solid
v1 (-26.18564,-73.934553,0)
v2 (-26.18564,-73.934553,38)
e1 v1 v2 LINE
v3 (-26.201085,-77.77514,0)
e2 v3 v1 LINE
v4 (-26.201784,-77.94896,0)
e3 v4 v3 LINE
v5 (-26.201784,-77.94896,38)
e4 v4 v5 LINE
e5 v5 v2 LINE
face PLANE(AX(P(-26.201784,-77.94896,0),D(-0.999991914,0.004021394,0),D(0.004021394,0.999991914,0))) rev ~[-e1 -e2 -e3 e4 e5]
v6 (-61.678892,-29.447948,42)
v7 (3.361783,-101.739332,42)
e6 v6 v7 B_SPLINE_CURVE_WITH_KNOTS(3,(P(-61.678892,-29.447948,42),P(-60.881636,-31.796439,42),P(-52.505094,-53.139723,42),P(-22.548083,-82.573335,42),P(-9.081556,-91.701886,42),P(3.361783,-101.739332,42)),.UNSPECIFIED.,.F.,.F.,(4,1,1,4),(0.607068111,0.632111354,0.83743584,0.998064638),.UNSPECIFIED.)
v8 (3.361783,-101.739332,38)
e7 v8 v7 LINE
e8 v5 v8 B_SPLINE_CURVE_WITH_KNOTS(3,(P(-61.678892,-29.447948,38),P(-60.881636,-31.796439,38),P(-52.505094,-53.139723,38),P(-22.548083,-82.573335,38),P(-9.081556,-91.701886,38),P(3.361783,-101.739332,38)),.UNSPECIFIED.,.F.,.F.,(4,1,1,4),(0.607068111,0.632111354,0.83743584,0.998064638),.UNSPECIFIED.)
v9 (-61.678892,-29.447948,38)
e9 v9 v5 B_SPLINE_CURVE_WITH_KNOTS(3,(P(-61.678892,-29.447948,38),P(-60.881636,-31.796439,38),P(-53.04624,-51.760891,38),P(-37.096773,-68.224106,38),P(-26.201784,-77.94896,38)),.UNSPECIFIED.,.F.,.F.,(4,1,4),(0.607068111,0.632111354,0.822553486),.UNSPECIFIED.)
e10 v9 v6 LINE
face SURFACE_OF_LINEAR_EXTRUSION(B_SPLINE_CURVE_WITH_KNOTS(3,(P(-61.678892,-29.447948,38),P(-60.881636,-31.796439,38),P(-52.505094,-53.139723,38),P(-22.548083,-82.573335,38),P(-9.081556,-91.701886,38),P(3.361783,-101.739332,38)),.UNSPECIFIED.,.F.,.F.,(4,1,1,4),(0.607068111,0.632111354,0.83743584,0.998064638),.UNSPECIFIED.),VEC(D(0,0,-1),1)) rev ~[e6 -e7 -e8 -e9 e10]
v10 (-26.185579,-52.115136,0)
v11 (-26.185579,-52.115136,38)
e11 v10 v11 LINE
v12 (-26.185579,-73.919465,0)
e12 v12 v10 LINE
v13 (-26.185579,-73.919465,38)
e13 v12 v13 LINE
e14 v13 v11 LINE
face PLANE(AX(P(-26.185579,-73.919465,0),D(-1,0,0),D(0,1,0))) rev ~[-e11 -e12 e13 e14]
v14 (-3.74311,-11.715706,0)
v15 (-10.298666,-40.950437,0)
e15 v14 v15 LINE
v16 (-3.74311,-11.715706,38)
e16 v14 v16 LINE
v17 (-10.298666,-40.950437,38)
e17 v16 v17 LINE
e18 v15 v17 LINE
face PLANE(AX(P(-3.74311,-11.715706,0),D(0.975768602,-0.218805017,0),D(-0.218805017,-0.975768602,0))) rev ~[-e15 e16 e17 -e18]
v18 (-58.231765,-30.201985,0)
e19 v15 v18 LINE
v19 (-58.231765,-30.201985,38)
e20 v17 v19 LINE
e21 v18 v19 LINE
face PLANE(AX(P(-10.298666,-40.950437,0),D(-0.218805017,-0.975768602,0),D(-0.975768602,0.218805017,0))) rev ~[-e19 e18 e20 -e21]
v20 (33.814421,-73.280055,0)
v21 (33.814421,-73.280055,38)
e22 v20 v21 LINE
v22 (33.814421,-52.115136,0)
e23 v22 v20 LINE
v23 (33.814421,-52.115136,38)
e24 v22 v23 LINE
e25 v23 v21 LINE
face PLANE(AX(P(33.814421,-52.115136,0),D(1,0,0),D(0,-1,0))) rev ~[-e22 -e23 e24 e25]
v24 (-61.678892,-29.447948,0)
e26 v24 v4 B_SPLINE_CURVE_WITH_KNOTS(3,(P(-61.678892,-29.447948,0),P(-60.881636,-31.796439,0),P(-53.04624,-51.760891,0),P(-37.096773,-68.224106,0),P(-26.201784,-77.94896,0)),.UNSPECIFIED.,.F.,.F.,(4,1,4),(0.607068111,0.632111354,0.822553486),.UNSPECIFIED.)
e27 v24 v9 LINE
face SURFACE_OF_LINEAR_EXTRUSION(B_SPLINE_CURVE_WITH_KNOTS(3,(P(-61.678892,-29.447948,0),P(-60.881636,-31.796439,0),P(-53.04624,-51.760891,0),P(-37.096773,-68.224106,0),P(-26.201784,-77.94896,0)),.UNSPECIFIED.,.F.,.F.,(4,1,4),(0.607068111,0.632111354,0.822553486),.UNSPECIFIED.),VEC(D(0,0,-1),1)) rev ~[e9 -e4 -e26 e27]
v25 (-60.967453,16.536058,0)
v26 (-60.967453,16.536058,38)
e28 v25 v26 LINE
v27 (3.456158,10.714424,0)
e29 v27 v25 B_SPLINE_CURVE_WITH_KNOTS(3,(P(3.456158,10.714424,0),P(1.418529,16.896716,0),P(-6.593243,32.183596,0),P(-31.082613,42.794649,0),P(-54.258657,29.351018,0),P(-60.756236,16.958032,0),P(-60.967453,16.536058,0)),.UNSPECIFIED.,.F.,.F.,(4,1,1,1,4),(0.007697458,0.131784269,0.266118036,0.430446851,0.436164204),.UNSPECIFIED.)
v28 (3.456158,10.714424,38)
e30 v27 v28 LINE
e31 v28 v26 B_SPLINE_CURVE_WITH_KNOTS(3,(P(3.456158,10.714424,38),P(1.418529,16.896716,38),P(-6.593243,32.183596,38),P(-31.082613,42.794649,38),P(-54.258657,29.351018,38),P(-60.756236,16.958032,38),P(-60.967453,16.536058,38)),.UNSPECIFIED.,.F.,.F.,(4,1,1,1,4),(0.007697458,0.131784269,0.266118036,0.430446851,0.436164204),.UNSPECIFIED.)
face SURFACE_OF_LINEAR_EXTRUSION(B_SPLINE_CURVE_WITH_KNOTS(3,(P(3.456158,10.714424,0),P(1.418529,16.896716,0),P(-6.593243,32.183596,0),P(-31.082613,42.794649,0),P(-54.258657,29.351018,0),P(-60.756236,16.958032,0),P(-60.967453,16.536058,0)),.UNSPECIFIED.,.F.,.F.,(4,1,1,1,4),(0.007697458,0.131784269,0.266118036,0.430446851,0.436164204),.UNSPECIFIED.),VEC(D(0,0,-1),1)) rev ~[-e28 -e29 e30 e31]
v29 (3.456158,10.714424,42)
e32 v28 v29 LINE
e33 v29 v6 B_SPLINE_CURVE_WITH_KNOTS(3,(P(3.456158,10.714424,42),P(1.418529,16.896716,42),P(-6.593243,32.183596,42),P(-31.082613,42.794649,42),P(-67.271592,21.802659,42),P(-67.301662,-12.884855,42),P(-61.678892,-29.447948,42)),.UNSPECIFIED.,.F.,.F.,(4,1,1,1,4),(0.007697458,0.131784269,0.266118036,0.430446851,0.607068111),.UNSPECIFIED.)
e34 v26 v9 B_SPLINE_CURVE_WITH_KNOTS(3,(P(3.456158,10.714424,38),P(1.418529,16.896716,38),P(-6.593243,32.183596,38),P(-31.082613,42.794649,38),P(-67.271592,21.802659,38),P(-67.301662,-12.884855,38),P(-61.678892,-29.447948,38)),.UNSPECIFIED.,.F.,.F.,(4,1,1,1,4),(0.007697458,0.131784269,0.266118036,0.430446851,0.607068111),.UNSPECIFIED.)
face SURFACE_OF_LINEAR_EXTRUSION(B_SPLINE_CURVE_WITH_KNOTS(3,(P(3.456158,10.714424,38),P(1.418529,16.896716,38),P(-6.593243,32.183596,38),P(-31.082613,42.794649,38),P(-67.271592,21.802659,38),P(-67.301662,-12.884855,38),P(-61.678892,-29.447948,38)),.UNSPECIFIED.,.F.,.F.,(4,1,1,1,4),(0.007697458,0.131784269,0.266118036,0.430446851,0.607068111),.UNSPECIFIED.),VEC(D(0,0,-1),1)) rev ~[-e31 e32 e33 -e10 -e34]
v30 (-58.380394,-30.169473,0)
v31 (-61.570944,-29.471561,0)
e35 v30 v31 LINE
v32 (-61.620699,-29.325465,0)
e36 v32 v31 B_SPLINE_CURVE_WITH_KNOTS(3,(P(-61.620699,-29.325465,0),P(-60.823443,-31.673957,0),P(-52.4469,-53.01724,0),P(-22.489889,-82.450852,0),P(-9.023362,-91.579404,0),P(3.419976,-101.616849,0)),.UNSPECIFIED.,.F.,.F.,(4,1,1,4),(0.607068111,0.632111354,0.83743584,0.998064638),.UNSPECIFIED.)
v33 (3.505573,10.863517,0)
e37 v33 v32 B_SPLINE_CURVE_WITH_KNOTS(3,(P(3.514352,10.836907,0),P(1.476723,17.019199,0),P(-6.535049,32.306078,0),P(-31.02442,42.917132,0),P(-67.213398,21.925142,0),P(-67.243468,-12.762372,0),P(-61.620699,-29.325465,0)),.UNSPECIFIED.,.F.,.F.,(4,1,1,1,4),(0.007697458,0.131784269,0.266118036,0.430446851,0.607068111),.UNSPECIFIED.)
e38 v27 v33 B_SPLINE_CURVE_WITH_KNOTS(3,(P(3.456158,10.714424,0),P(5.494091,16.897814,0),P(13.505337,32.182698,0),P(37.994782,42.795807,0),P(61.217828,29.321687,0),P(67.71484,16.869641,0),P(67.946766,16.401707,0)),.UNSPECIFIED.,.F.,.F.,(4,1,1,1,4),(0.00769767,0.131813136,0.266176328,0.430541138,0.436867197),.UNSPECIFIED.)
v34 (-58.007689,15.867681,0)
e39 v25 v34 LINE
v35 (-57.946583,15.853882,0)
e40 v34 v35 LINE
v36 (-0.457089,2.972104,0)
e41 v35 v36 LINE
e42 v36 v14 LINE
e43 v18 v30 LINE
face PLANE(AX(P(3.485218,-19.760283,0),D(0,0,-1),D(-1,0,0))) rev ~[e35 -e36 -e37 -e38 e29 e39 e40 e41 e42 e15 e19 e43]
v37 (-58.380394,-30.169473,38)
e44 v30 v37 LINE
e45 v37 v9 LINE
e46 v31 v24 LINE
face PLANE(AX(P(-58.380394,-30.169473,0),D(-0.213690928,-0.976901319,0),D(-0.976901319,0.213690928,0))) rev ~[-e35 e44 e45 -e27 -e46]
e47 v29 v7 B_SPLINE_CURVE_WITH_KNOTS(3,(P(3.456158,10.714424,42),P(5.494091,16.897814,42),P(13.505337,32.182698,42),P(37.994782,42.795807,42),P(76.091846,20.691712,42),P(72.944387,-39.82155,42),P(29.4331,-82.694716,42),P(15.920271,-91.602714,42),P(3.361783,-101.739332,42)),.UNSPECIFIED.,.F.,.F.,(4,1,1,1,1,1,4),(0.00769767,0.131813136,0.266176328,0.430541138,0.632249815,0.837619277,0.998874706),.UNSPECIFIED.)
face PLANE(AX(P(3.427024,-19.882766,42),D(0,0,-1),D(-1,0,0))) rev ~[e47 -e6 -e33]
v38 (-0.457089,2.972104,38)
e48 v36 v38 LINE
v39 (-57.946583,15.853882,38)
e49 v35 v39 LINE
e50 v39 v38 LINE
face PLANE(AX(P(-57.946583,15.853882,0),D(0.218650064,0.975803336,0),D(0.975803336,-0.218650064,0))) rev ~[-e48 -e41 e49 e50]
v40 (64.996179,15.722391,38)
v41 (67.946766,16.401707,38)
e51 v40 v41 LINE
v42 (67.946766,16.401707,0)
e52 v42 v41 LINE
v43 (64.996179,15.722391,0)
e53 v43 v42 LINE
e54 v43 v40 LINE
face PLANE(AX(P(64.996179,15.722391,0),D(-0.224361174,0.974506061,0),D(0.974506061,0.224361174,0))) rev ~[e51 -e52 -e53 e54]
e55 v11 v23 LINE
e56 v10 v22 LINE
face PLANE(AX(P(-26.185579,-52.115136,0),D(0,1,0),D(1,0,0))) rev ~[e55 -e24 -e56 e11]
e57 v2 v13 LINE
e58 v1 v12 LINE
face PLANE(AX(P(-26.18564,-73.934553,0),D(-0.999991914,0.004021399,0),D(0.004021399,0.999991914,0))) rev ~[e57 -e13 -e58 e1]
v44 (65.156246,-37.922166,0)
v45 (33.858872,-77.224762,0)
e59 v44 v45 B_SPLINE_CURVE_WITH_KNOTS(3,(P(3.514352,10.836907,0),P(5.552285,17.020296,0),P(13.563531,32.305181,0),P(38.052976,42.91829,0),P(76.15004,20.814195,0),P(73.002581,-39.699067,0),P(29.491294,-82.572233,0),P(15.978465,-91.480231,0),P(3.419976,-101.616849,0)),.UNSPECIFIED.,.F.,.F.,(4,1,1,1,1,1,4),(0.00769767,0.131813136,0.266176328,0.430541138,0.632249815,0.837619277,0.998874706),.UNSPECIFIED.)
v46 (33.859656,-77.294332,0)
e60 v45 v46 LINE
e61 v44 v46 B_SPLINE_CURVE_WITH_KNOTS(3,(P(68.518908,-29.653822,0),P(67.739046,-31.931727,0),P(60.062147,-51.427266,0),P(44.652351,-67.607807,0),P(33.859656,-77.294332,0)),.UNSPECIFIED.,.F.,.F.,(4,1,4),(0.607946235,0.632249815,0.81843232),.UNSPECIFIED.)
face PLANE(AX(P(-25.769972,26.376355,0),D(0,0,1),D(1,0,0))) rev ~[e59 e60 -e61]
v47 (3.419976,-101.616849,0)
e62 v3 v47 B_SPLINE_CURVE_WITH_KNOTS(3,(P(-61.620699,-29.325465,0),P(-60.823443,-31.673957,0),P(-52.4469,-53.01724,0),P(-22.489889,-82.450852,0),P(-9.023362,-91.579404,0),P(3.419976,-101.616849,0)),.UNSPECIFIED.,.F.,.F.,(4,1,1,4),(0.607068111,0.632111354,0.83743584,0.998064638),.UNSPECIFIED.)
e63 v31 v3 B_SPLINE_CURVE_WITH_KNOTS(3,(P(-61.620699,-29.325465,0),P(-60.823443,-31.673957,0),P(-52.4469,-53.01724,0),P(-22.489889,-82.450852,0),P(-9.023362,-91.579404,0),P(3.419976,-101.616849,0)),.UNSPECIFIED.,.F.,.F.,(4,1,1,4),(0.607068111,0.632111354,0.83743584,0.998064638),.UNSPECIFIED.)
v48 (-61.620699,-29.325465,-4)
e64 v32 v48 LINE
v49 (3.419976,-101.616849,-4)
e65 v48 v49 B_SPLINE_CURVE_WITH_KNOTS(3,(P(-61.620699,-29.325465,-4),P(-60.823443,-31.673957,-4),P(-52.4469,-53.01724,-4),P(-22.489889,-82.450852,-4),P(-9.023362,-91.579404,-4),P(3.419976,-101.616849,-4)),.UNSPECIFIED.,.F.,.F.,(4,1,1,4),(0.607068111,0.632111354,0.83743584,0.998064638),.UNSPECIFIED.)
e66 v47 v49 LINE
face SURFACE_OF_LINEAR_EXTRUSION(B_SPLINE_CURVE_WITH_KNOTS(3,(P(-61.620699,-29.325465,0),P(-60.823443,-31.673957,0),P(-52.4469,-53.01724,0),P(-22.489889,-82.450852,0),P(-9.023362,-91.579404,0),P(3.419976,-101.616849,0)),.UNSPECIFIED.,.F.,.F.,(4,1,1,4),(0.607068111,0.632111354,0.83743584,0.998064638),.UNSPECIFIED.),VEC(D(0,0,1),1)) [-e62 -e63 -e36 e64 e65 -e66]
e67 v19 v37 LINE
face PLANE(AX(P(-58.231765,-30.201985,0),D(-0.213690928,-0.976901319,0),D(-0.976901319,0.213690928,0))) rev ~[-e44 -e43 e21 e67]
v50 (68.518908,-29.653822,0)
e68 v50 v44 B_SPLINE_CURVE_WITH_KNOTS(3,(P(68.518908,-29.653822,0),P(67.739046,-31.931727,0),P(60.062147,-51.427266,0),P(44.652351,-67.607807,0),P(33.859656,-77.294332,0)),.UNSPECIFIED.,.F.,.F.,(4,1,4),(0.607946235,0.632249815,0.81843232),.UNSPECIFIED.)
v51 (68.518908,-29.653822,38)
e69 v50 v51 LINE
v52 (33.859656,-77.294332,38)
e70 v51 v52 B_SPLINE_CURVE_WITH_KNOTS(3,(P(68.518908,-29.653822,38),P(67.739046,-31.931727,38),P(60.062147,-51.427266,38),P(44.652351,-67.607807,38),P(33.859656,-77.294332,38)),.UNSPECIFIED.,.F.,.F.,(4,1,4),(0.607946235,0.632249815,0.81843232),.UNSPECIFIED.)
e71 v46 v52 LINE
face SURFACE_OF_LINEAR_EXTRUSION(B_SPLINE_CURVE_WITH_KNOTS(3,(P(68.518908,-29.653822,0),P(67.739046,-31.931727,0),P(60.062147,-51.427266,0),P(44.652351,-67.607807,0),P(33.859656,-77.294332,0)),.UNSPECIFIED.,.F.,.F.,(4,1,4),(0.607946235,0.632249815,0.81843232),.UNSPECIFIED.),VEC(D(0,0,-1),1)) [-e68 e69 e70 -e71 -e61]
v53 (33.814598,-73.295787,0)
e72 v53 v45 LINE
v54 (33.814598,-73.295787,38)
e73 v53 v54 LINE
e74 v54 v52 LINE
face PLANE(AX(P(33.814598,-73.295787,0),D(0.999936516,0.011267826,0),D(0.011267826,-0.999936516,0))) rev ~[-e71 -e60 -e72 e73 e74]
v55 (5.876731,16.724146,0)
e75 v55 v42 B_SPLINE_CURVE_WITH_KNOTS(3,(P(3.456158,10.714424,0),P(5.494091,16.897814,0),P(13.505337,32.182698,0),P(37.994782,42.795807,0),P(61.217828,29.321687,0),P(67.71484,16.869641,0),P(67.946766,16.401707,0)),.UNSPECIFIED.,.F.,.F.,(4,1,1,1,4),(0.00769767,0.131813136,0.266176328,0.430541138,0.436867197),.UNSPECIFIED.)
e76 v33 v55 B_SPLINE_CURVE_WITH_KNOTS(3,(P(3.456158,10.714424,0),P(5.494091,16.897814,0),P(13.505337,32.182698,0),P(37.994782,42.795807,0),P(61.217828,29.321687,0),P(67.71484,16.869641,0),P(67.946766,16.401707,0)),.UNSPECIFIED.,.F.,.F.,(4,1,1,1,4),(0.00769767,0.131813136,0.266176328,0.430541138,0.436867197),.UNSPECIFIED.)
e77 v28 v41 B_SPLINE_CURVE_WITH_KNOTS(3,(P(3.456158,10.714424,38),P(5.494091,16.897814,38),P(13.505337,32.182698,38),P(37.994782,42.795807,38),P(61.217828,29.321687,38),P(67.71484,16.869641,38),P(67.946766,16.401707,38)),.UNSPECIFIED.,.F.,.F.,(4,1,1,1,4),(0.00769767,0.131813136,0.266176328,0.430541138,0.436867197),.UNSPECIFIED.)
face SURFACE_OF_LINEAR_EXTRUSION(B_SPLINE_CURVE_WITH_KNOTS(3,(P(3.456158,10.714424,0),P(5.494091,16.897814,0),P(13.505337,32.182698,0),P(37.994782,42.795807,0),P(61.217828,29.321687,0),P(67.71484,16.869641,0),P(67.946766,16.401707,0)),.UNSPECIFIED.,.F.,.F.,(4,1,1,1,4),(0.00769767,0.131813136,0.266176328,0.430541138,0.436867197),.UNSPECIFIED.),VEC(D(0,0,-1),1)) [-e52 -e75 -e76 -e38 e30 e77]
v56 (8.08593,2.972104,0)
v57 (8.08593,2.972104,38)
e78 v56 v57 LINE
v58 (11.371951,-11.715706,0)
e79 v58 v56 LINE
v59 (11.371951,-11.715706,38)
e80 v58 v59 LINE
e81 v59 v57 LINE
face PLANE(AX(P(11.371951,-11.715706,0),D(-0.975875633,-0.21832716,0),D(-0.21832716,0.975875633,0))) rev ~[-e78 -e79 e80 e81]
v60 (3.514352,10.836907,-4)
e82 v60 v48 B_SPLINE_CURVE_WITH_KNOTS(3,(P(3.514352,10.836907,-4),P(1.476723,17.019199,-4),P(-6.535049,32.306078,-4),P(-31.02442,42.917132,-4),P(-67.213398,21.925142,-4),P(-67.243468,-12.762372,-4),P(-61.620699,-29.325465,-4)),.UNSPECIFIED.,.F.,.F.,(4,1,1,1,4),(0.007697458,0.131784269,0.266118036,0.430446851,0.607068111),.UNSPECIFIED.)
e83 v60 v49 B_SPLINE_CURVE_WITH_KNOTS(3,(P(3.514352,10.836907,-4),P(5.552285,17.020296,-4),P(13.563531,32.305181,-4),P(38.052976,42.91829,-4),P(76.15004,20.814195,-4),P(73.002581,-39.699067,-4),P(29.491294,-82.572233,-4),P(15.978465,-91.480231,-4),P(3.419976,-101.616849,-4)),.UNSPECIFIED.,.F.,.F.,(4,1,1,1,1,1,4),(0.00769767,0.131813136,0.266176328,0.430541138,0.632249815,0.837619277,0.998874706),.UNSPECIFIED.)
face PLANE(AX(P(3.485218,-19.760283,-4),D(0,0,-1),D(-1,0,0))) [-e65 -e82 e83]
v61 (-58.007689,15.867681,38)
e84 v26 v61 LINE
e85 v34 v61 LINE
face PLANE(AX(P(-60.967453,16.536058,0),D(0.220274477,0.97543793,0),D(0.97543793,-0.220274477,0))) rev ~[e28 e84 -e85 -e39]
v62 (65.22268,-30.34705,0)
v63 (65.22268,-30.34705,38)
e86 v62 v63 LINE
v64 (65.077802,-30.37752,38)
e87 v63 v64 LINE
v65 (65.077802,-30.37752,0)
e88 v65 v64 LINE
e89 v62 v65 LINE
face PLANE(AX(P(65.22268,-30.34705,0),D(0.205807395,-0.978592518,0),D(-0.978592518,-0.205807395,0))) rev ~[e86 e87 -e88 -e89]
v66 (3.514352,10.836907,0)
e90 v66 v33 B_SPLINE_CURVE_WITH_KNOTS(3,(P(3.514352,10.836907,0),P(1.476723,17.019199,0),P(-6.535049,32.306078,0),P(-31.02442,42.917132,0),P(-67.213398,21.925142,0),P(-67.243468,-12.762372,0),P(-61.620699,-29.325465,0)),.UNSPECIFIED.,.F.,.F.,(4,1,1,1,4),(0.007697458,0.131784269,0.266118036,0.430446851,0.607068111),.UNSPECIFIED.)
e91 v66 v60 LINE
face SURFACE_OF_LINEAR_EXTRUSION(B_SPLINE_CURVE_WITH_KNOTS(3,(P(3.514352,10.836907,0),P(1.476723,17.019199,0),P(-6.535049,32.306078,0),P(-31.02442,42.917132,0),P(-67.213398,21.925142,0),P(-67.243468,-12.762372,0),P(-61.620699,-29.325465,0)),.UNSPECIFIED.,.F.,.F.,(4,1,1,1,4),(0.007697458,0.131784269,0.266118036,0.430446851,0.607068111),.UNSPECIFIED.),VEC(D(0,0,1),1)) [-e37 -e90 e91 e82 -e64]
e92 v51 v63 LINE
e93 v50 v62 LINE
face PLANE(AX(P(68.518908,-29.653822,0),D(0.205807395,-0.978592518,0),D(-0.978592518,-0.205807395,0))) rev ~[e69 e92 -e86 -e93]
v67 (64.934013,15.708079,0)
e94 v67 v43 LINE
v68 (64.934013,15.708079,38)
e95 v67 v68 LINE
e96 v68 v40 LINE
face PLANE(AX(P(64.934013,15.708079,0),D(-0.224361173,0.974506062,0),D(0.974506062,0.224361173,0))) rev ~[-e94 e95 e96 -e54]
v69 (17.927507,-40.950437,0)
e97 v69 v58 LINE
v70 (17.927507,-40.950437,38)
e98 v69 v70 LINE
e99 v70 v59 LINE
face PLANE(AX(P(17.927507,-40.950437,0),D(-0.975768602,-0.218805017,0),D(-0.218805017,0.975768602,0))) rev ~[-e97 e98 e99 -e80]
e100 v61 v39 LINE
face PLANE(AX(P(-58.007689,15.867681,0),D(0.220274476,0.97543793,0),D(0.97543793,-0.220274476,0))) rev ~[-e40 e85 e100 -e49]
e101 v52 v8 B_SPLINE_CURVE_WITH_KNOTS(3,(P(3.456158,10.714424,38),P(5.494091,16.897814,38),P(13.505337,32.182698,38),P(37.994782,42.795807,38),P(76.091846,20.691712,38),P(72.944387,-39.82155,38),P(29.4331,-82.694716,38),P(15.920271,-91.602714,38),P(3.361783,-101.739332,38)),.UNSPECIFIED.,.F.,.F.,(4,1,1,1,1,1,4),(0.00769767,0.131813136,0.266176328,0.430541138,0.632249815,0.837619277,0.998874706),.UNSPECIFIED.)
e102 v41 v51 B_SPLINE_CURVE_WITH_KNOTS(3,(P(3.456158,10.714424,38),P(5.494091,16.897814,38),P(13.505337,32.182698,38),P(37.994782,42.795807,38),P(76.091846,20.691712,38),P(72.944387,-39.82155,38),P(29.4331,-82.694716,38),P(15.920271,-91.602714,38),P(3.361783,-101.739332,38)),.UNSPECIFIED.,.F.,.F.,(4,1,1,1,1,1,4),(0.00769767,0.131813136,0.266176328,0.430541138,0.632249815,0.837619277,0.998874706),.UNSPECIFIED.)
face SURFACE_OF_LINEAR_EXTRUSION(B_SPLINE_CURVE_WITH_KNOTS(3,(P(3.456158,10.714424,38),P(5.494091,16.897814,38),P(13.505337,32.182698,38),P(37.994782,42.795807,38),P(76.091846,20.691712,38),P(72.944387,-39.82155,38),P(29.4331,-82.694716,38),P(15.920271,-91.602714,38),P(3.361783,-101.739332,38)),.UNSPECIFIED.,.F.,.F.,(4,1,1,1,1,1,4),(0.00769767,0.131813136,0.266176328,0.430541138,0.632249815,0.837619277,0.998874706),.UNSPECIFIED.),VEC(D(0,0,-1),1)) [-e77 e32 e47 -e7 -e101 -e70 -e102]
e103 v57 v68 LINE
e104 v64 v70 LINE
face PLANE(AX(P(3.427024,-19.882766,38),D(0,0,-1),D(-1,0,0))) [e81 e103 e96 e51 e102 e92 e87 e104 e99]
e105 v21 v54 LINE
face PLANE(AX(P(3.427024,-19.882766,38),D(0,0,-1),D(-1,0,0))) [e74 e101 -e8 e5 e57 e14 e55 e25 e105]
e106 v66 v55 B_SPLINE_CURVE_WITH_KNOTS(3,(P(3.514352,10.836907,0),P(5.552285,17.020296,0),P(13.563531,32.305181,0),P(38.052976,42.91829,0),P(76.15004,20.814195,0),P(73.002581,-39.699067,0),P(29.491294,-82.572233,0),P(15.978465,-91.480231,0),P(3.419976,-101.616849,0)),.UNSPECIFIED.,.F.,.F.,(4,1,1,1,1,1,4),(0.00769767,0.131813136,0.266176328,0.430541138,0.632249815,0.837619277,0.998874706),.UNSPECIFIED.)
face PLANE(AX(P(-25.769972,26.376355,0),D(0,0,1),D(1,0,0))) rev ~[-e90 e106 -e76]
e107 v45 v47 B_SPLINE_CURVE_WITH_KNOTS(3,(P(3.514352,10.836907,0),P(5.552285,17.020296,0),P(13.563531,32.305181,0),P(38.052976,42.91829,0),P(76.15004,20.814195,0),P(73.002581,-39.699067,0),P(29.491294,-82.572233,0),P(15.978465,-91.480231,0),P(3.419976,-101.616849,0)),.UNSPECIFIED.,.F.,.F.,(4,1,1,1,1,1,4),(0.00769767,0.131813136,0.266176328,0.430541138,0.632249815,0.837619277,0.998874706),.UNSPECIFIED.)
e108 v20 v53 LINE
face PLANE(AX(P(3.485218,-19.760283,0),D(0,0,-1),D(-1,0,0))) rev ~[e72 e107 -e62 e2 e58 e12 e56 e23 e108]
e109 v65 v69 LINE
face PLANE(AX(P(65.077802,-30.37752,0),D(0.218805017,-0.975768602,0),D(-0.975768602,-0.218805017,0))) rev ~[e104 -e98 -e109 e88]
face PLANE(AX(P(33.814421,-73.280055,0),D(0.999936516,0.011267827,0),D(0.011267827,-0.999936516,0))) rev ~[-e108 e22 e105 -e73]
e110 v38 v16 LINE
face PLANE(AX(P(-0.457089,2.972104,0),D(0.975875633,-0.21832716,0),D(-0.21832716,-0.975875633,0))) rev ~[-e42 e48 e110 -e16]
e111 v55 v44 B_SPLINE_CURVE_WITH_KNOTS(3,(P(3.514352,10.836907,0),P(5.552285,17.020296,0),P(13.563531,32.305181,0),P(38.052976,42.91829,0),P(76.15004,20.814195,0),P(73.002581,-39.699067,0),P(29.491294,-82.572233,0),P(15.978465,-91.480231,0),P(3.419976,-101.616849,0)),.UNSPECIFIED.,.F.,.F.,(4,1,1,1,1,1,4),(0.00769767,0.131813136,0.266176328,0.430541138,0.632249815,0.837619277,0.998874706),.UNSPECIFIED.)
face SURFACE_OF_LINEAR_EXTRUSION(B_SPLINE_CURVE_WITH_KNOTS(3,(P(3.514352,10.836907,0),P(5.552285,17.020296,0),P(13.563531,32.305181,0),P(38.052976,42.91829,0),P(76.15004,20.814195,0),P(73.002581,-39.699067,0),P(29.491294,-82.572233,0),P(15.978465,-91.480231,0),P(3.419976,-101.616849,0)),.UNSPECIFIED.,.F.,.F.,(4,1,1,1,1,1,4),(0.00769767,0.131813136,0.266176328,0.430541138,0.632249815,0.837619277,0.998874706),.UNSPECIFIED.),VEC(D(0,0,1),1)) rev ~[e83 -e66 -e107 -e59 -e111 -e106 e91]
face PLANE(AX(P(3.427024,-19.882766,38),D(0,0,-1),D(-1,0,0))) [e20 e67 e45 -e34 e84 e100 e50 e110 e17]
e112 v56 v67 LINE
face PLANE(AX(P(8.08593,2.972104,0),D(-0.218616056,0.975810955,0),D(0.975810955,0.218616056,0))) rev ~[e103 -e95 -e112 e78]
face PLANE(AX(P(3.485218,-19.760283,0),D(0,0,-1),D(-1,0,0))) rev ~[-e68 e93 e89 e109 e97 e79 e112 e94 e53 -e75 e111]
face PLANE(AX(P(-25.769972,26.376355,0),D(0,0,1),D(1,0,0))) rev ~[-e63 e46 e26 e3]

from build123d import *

# Parameters (mm, degrees)
F2_DEPTH = 4
F3_DEPTH = 38
F5_DEPTH = 4


with BuildPart() as f2:
    # F0 (on Top) → F2 (new body)
    with BuildSketch(Plane.XY):
        with BuildLine():
            add(Edge.make_bspline(
                [(3.5143517643, 10.8369065524), (5.5522846532, 17.0202964238), (13.5635309523, 32.3051806354), (38.0529758977, 42.9182898293), (76.1500396351, 20.8141947476), (73.0025805002, -39.6990670077), (29.4912941702, -82.5722333451), (15.9784645563, -91.4802309528), (3.4199764202, -101.6168494477)],
                knots=[0.0076976703, 0.0076976703, 0.0076976703, 0.0076976703, 0.131813136, 0.2661763282, 0.4305411385, 0.6322498153, 0.8376192768, 0.9988747062, 0.9988747062, 0.9988747062, 0.9988747062], degree=3))
            add(Edge.make_bspline(
                [(3.5143517643, 10.8369065524), (1.4767227153, 17.0191988842), (-6.5350491987, 32.3060784633), (-31.0244195059, 42.9171319232), (-67.2133981013, 21.9251415174), (-67.2434681856, -12.7623719687), (-61.6206986806, -29.3254648223)],
                knots=[0.0076974584, 0.0076974584, 0.0076974584, 0.0076974584, 0.1317842693, 0.2661180362, 0.430446851, 0.6070681111, 0.6070681111, 0.6070681111, 0.6070681111], degree=3))
            add(Edge.make_bspline(
                [(-61.6206986806, -29.3254648223), (-60.8234425431, -31.6739565081), (-52.4468997731, -53.0172398251), (-22.4898889785, -82.4508519177), (-9.0233623554, -91.5794035072), (3.4199764202, -101.6168494478)],
                knots=[0.6070681111, 0.6070681111, 0.6070681111, 0.6070681111, 0.6321113542, 0.8374358402, 0.9980646384, 0.9980646384, 0.9980646384, 0.9980646384], degree=3))
        make_face()
    extrude(amount=-F2_DEPTH)

    # F1 (on Top) → F3 (join)
    with BuildSketch(Plane.XY):
        with BuildLine():
            Line((3.4561579753, 4.9706855789), (3.4561579753, 10.7144238582))
            add(Edge.make_bspline(
                [(3.4561579753, 10.7144238582), (1.4185289263, 16.8967161901), (-6.5932429877, 32.1835957691), (-31.0826132949, 42.7946492291), (-54.2586567025, 29.3510180535), (-60.7562355129, 16.9580322491), (-60.9674526745, 16.5360577067)],
                knots=[0.0076974584, 0.0076974584, 0.0076974584, 0.0076974584, 0.1317842693, 0.2661180362, 0.430446851, 0.4361642042, 0.4361642042, 0.4361642042, 0.4361642042], degree=3))
            Line((-60.9674526745, 16.5360577067), (-58.0076894224, 15.867680681))
            add(Edge.make_bspline(
                [(0.6479399733, 9.7061794304), (0.6046874636, 9.8469388096), (0.2425584, 11.0072172518), (-0.7433365613, 13.808672451), (-2.7746951207, 17.9846349652), (-5.4067765074, 22.3254866101), (-8.227454907, 25.8258588748), (-10.9956638863, 28.4577402835), (-13.8782115073, 30.8251417264), (-17.2785962738, 32.9258246007), (-21.0533247221, 34.2378846946), (-24.43835167, 34.841782762), (-27.3674152087, 35.071859033), (-30.1156927854, 34.9731006728), (-32.9581094547, 34.569195533), (-36.2057374717, 33.7631574987), (-40.1912204669, 32.4070557976), (-44.7886427582, 30.1694226431), (-49.0054010757, 27.0313811661), (-52.2822431782, 23.8435342174), (-54.8028625403, 20.9332222243), (-56.6157057067, 18.3435283848), (-57.6173148948, 16.6079375436), (-58.0076894224, 15.867680681)],
                knots=[1.0346969255, 1.0346969255, 1.0346969255, 1.0346969255, 1.4764116286, 4.6804711386, 9.9341891836, 15.3755233357, 19.8806101881, 23.3717041386, 26.8172416279, 31.0622114635, 35.2849692506, 38.7181632425, 41.3564122598, 44.0851089452, 46.950605509, 49.9535976365, 54.1107624907, 59.5638005463, 65.2173136521, 69.7961412229, 73.2590786057, 76.7528432893, 79.2625536342, 79.2625536342, 79.2625536342, 79.2625536342], degree=3))
            Line((0.6479399733, 9.7061794304), (3.4561579753, 4.9706855789))
        make_face()
        with BuildLine():
            add(Edge.make_bspline(
                [(3.4561579753, 10.7144238582), (5.4940908642, 16.8978137296), (13.5053371633, 32.1826979412), (37.9947821087, 42.7958071352), (61.2178280842, 29.3216869282), (67.7148401511, 16.8696405191), (67.9467655848, 16.4017067521)],
                knots=[0.0076976703, 0.0076976703, 0.0076976703, 0.0076976703, 0.131813136, 0.2661763282, 0.4305411385, 0.4368671972, 0.4368671972, 0.4368671972, 0.4368671972], degree=3))
            Line((3.4561579753, 10.7144238582), (3.4561579753, 4.9706855789))
            Line((3.4561579753, 4.9706855789), (6.2643968648, 9.7062252128))
            add(Edge.make_bspline(
                [(6.2643968648, 9.7062252128), (6.3076486729, 9.8469830471), (6.6697378015, 11.0071453652), (7.6553980554, 13.8080845857), (9.6861370738, 17.9831208796), (12.3173154362, 22.3229027777), (15.1369801468, 25.8225494523), (17.9041390829, 28.4542580271), (20.7856825363, 30.8217142867), (24.1848309962, 32.9227969264), (27.9582556119, 34.2357642717), (31.3421507414, 34.8406865104), (34.2701868543, 35.0717329948), (37.0174798546, 34.9740230615), (39.8589626189, 34.5712402368), (43.1056884615, 33.7665178192), (47.0903857798, 32.4121016938), (51.6872631016, 30.1766110563), (55.9041914607, 27.0411903844), (59.1817327794, 23.8559024251), (61.7031894031, 20.9479678244), (63.5524491428, 18.3097055332), (64.5811168155, 16.5190110217), (64.9961785615, 15.7223911545)],
                knots=[1.034745177, 1.034745177, 1.034745177, 1.034745177, 1.4764548012, 4.6801509047, 9.9325497122, 15.3722717754, 19.8761534689, 23.3665208211, 26.8113738629, 31.0555412324, 35.2773405266, 38.7095624039, 41.3469473392, 44.0746442343, 46.9389452952, 49.9408817932, 54.0967228935, 59.5482830735, 65.2003821651, 69.7779367022, 73.2397529952, 76.7321812838, 79.4260754256, 79.4260754256, 79.4260754256, 79.4260754256], degree=3))
            Line((64.9961785615, 15.7223911545), (67.9467655848, 16.4017067521))
        make_face()
        with BuildLine():
            Line((6.2643968648, 9.7062252128), (3.4561579753, 4.9706855789))
            Line((3.4561579753, 4.9706855789), (0.6479399733, 9.7061794304))
            add(Edge.make_bspline(
                [(0.6479399733, 9.7061794304), (0.6046874636, 9.8469388096), (0.2425584, 11.0072172518), (-0.7433365613, 13.808672451), (-2.7746951207, 17.9846349652), (-5.4067765074, 22.3254866101), (-8.227454907, 25.8258588748), (-10.9956638863, 28.4577402835), (-13.8782115073, 30.8251417264), (-17.2785962738, 32.9258246007), (-21.0533247221, 34.2378846946), (-24.43835167, 34.841782762), (-27.3674152087, 35.071859033), (-30.1156927854, 34.9731006728), (-32.9581094547, 34.569195533), (-36.2057374717, 33.7631574987), (-40.1912204669, 32.4070557976), (-44.7886427582, 30.1694226431), (-49.0054010757, 27.0313811661), (-52.2822431782, 23.8435342174), (-54.8028625403, 20.9332222243), (-56.6157057067, 18.3435283848), (-57.6173148948, 16.6079375436), (-58.0076894224, 15.867680681)],
                knots=[1.0346969255, 1.0346969255, 1.0346969255, 1.0346969255, 1.4764116286, 4.6804711386, 9.9341891836, 15.3755233357, 19.8806101881, 23.3717041386, 26.8172416279, 31.0622114635, 35.2849692506, 38.7181632425, 41.3564122598, 44.0851089452, 46.950605509, 49.9535976365, 54.1107624907, 59.5638005463, 65.2173136521, 69.7961412229, 73.2590786057, 76.7528432893, 79.2625536342, 79.2625536342, 79.2625536342, 79.2625536342], degree=3))
            Line((-58.0076894224, 15.867680681), (-57.9465831476, 15.8538815942))
            Line((-57.9465831476, 15.8538815942), (-0.4570892527, 2.9721040336))
            Line((-0.4570892527, 2.9721040336), (-3.7431103507, -11.7157063329))
            Line((-3.7431103507, -11.7157063329), (-10.2986664004, -40.9504371215))
            Line((-10.2986664004, -40.9504371215), (-58.2317647828, -30.201984695))
            Line((-58.2317647828, -30.201984695), (-58.3803942393, -30.1694729501))
            add(Edge.make_bspline(
                [(-58.3803942393, -30.1694729501), (-58.1555596349, -30.7636155671), (-57.1914047793, -33.2104050549), (-55.2539965122, -37.4204653201), (-52.261503605, -43.2065561699), (-48.2577140945, -49.5745432001), (-43.1622417941, -56.2991762185), (-37.7802365002, -62.5431818573), (-32.897833219, -67.5664981209), (-29.1434884385, -71.1923826424), (-27.0245490324, -73.1666145526), (-26.1856401319, -73.9345530884)],
                knots=[126.5893078984, 126.5893078984, 126.5893078984, 126.5893078984, 128.4943272239, 134.4758365242, 140.4840464521, 148.0263281727, 157.0085926933, 165.7708543176, 172.7401643843, 178.0161441156, 181.428082058, 181.428082058, 181.428082058, 181.428082058], degree=3))
            Line((-26.1856401319, -73.9345530884), (-26.1855794561, -73.9194649769))
            Line((-26.1855794561, -73.9194649769), (-26.1855794561, -52.1151364364))
            Line((-26.1855794561, -52.1151364364), (3.8144205439, -52.1151364364))
            Line((3.8144205439, -52.1151364364), (33.8144205439, -52.1151364364))
            Line((33.8144205439, -52.1151364364), (33.8144205439, -73.2800545906))
            Line((33.8144205439, -73.2800545906), (33.8145978261, -73.295787078))
            add(Edge.make_bspline(
                [(65.2226804963, -30.3470502278), (65.0237913966, -30.8686445443), (64.0856409406, -33.2436350348), (62.183747075, -37.3870630535), (59.1957142226, -43.1787098395), (55.197398604, -49.5539356548), (50.1072963279, -56.2861455606), (44.7295313025, -62.5353271551), (39.8489959503, -67.5590883153), (36.3155537504, -70.9682702153), (34.4244042671, -72.7336646435), (33.8145978261, -73.295787078)],
                knots=[126.7787238633, 126.7787238633, 126.7787238633, 126.7787238633, 128.4527743373, 134.4366412672, 140.4475244108, 147.9934656014, 156.9790826267, 165.7426161188, 172.7105318281, 177.9834554998, 180.4715207481, 180.4715207481, 180.4715207481, 180.4715207481], degree=3))
            Line((65.2226804963, -30.3470502278), (65.0778019164, -30.3775195831))
            Line((65.0778019164, -30.3775195831), (17.9275074882, -40.9504371215))
            Line((17.9275074882, -40.9504371215), (11.3719514384, -11.7157063329))
            Line((11.3719514384, -11.7157063329), (8.0859303405, 2.9721040336))
            Line((8.0859303405, 2.9721040336), (64.9340126509, 15.7080786559))
            Line((64.9340126509, 15.7080786559), (64.9961785615, 15.7223911545))
            add(Edge.make_bspline(
                [(6.2643968648, 9.7062252128), (6.3076486729, 9.8469830471), (6.6697378015, 11.0071453652), (7.6553980554, 13.8080845857), (9.6861370738, 17.9831208796), (12.3173154362, 22.3229027777), (15.1369801468, 25.8225494523), (17.9041390829, 28.4542580271), (20.7856825363, 30.8217142867), (24.1848309962, 32.9227969264), (27.9582556119, 34.2357642717), (31.3421507414, 34.8406865104), (34.2701868543, 35.0717329948), (37.0174798546, 34.9740230615), (39.8589626189, 34.5712402368), (43.1056884615, 33.7665178192), (47.0903857798, 32.4121016938), (51.6872631016, 30.1766110563), (55.9041914607, 27.0411903844), (59.1817327794, 23.8559024251), (61.7031894031, 20.9479678244), (63.5524491428, 18.3097055332), (64.5811168155, 16.5190110217), (64.9961785615, 15.7223911545)],
                knots=[1.034745177, 1.034745177, 1.034745177, 1.034745177, 1.4764548012, 4.6801509047, 9.9325497122, 15.3722717754, 19.8761534689, 23.3665208211, 26.8113738629, 31.0555412324, 35.2773405266, 38.7095624039, 41.3469473392, 44.0746442343, 46.9389452952, 49.9408817932, 54.0967228935, 59.5482830735, 65.2003821651, 69.7779367022, 73.2397529952, 76.7321812838, 79.4260754256, 79.4260754256, 79.4260754256, 79.4260754256], degree=3))
        make_face()
        with BuildLine():
            Line((-58.3803942393, -30.1694729501), (-61.6788924696, -29.4479475164))
            add(Edge.make_bspline(
                [(-61.6788924696, -29.4479475164), (-60.881636332, -31.7964392023), (-53.0462399942, -51.7608909495), (-37.0967734108, -68.2241063055), (-26.2017837773, -77.9489602814)],
                knots=[0.6070681111, 0.6070681111, 0.6070681111, 0.6070681111, 0.6321113542, 0.8225534862, 0.8225534862, 0.8225534862, 0.8225534862], degree=3))
            Line((-26.2017837773, -77.9489602814), (-26.1856401319, -73.9345530884))
            add(Edge.make_bspline(
                [(-58.3803942393, -30.1694729501), (-58.1555596349, -30.7636155671), (-57.1914047793, -33.2104050549), (-55.2539965122, -37.4204653201), (-52.261503605, -43.2065561699), (-48.2577140945, -49.5745432001), (-43.1622417941, -56.2991762185), (-37.7802365002, -62.5431818573), (-32.897833219, -67.5664981209), (-29.1434884385, -71.1923826424), (-27.0245490324, -73.1666145526), (-26.1856401319, -73.9345530884)],
                knots=[126.5893078984, 126.5893078984, 126.5893078984, 126.5893078984, 128.4943272239, 134.4758365242, 140.4840464521, 148.0263281727, 157.0085926933, 165.7708543176, 172.7401643843, 178.0161441156, 181.428082058, 181.428082058, 181.428082058, 181.428082058], degree=3))
        make_face()
        with BuildLine():
            add(Edge.make_bspline(
                [(68.518907896, -29.6538219824), (67.7390456014, -31.9317266469), (60.0621472753, -51.4272664766), (44.652351305, -67.6078067079), (33.8596555935, -77.2943319762)],
                knots=[0.6079462349, 0.6079462349, 0.6079462349, 0.6079462349, 0.6322498153, 0.8184323199, 0.8184323199, 0.8184323199, 0.8184323199], degree=3))
            Line((68.518907896, -29.6538219824), (65.2226804963, -30.3470502278))
            add(Edge.make_bspline(
                [(65.2226804963, -30.3470502278), (65.0237913966, -30.8686445443), (64.0856409406, -33.2436350348), (62.183747075, -37.3870630535), (59.1957142226, -43.1787098395), (55.197398604, -49.5539356548), (50.1072963279, -56.2861455606), (44.7295313025, -62.5353271551), (39.8489959503, -67.5590883153), (36.3155537504, -70.9682702153), (34.4244042671, -72.7336646435), (33.8145978261, -73.295787078)],
                knots=[126.7787238633, 126.7787238633, 126.7787238633, 126.7787238633, 128.4527743373, 134.4366412672, 140.4475244108, 147.9934656014, 156.9790826267, 165.7426161188, 172.7105318281, 177.9834554998, 180.4715207481, 180.4715207481, 180.4715207481, 180.4715207481], degree=3))
            Line((33.8145978261, -73.295787078), (33.8596555935, -77.2943319762))
        make_face()
    extrude(amount=F3_DEPTH)

    # F4 (on face) → F5 (join)
    with BuildSketch(Plane.XY.offset(38)):
        with BuildLine():
            add(Edge.make_bspline(
                [(3.4561579753, 10.7144238582), (5.4940908642, 16.8978137296), (13.5053371633, 32.1826979412), (37.9947821087, 42.7958071352), (76.0918458462, 20.6917120534), (72.9443867112, -39.8215497018), (29.4331003812, -82.6947160393), (15.9202707673, -91.6027136469), (3.3617826313, -101.7393321419)],
                knots=[0.0076976703, 0.0076976703, 0.0076976703, 0.0076976703, 0.131813136, 0.2661763282, 0.4305411385, 0.6322498153, 0.8376192768, 0.9988747062, 0.9988747062, 0.9988747062, 0.9988747062], degree=3))
            add(Edge.make_bspline(
                [(3.4561579753, 10.7144238582), (1.4185289263, 16.8967161901), (-6.5932429877, 32.1835957691), (-31.0826132949, 42.7946492291), (-67.2715918903, 21.8026588232), (-67.3016619746, -12.8848546628), (-61.6788924696, -29.4479475164)],
                knots=[0.0076974584, 0.0076974584, 0.0076974584, 0.0076974584, 0.1317842693, 0.2661180362, 0.430446851, 0.6070681111, 0.6070681111, 0.6070681111, 0.6070681111], degree=3))
            add(Edge.make_bspline(
                [(-61.6788924696, -29.4479475164), (-60.881636332, -31.7964392023), (-52.5050935621, -53.1397225192), (-22.5480827674, -82.5733346119), (-9.0815561443, -91.7018862014), (3.3617826313, -101.7393321419)],
                knots=[0.6070681111, 0.6070681111, 0.6070681111, 0.6070681111, 0.6321113542, 0.8374358402, 0.9980646384, 0.9980646384, 0.9980646384, 0.9980646384], degree=3))
        make_face()
    extrude(amount=F5_DEPTH)


solid = f2.part
